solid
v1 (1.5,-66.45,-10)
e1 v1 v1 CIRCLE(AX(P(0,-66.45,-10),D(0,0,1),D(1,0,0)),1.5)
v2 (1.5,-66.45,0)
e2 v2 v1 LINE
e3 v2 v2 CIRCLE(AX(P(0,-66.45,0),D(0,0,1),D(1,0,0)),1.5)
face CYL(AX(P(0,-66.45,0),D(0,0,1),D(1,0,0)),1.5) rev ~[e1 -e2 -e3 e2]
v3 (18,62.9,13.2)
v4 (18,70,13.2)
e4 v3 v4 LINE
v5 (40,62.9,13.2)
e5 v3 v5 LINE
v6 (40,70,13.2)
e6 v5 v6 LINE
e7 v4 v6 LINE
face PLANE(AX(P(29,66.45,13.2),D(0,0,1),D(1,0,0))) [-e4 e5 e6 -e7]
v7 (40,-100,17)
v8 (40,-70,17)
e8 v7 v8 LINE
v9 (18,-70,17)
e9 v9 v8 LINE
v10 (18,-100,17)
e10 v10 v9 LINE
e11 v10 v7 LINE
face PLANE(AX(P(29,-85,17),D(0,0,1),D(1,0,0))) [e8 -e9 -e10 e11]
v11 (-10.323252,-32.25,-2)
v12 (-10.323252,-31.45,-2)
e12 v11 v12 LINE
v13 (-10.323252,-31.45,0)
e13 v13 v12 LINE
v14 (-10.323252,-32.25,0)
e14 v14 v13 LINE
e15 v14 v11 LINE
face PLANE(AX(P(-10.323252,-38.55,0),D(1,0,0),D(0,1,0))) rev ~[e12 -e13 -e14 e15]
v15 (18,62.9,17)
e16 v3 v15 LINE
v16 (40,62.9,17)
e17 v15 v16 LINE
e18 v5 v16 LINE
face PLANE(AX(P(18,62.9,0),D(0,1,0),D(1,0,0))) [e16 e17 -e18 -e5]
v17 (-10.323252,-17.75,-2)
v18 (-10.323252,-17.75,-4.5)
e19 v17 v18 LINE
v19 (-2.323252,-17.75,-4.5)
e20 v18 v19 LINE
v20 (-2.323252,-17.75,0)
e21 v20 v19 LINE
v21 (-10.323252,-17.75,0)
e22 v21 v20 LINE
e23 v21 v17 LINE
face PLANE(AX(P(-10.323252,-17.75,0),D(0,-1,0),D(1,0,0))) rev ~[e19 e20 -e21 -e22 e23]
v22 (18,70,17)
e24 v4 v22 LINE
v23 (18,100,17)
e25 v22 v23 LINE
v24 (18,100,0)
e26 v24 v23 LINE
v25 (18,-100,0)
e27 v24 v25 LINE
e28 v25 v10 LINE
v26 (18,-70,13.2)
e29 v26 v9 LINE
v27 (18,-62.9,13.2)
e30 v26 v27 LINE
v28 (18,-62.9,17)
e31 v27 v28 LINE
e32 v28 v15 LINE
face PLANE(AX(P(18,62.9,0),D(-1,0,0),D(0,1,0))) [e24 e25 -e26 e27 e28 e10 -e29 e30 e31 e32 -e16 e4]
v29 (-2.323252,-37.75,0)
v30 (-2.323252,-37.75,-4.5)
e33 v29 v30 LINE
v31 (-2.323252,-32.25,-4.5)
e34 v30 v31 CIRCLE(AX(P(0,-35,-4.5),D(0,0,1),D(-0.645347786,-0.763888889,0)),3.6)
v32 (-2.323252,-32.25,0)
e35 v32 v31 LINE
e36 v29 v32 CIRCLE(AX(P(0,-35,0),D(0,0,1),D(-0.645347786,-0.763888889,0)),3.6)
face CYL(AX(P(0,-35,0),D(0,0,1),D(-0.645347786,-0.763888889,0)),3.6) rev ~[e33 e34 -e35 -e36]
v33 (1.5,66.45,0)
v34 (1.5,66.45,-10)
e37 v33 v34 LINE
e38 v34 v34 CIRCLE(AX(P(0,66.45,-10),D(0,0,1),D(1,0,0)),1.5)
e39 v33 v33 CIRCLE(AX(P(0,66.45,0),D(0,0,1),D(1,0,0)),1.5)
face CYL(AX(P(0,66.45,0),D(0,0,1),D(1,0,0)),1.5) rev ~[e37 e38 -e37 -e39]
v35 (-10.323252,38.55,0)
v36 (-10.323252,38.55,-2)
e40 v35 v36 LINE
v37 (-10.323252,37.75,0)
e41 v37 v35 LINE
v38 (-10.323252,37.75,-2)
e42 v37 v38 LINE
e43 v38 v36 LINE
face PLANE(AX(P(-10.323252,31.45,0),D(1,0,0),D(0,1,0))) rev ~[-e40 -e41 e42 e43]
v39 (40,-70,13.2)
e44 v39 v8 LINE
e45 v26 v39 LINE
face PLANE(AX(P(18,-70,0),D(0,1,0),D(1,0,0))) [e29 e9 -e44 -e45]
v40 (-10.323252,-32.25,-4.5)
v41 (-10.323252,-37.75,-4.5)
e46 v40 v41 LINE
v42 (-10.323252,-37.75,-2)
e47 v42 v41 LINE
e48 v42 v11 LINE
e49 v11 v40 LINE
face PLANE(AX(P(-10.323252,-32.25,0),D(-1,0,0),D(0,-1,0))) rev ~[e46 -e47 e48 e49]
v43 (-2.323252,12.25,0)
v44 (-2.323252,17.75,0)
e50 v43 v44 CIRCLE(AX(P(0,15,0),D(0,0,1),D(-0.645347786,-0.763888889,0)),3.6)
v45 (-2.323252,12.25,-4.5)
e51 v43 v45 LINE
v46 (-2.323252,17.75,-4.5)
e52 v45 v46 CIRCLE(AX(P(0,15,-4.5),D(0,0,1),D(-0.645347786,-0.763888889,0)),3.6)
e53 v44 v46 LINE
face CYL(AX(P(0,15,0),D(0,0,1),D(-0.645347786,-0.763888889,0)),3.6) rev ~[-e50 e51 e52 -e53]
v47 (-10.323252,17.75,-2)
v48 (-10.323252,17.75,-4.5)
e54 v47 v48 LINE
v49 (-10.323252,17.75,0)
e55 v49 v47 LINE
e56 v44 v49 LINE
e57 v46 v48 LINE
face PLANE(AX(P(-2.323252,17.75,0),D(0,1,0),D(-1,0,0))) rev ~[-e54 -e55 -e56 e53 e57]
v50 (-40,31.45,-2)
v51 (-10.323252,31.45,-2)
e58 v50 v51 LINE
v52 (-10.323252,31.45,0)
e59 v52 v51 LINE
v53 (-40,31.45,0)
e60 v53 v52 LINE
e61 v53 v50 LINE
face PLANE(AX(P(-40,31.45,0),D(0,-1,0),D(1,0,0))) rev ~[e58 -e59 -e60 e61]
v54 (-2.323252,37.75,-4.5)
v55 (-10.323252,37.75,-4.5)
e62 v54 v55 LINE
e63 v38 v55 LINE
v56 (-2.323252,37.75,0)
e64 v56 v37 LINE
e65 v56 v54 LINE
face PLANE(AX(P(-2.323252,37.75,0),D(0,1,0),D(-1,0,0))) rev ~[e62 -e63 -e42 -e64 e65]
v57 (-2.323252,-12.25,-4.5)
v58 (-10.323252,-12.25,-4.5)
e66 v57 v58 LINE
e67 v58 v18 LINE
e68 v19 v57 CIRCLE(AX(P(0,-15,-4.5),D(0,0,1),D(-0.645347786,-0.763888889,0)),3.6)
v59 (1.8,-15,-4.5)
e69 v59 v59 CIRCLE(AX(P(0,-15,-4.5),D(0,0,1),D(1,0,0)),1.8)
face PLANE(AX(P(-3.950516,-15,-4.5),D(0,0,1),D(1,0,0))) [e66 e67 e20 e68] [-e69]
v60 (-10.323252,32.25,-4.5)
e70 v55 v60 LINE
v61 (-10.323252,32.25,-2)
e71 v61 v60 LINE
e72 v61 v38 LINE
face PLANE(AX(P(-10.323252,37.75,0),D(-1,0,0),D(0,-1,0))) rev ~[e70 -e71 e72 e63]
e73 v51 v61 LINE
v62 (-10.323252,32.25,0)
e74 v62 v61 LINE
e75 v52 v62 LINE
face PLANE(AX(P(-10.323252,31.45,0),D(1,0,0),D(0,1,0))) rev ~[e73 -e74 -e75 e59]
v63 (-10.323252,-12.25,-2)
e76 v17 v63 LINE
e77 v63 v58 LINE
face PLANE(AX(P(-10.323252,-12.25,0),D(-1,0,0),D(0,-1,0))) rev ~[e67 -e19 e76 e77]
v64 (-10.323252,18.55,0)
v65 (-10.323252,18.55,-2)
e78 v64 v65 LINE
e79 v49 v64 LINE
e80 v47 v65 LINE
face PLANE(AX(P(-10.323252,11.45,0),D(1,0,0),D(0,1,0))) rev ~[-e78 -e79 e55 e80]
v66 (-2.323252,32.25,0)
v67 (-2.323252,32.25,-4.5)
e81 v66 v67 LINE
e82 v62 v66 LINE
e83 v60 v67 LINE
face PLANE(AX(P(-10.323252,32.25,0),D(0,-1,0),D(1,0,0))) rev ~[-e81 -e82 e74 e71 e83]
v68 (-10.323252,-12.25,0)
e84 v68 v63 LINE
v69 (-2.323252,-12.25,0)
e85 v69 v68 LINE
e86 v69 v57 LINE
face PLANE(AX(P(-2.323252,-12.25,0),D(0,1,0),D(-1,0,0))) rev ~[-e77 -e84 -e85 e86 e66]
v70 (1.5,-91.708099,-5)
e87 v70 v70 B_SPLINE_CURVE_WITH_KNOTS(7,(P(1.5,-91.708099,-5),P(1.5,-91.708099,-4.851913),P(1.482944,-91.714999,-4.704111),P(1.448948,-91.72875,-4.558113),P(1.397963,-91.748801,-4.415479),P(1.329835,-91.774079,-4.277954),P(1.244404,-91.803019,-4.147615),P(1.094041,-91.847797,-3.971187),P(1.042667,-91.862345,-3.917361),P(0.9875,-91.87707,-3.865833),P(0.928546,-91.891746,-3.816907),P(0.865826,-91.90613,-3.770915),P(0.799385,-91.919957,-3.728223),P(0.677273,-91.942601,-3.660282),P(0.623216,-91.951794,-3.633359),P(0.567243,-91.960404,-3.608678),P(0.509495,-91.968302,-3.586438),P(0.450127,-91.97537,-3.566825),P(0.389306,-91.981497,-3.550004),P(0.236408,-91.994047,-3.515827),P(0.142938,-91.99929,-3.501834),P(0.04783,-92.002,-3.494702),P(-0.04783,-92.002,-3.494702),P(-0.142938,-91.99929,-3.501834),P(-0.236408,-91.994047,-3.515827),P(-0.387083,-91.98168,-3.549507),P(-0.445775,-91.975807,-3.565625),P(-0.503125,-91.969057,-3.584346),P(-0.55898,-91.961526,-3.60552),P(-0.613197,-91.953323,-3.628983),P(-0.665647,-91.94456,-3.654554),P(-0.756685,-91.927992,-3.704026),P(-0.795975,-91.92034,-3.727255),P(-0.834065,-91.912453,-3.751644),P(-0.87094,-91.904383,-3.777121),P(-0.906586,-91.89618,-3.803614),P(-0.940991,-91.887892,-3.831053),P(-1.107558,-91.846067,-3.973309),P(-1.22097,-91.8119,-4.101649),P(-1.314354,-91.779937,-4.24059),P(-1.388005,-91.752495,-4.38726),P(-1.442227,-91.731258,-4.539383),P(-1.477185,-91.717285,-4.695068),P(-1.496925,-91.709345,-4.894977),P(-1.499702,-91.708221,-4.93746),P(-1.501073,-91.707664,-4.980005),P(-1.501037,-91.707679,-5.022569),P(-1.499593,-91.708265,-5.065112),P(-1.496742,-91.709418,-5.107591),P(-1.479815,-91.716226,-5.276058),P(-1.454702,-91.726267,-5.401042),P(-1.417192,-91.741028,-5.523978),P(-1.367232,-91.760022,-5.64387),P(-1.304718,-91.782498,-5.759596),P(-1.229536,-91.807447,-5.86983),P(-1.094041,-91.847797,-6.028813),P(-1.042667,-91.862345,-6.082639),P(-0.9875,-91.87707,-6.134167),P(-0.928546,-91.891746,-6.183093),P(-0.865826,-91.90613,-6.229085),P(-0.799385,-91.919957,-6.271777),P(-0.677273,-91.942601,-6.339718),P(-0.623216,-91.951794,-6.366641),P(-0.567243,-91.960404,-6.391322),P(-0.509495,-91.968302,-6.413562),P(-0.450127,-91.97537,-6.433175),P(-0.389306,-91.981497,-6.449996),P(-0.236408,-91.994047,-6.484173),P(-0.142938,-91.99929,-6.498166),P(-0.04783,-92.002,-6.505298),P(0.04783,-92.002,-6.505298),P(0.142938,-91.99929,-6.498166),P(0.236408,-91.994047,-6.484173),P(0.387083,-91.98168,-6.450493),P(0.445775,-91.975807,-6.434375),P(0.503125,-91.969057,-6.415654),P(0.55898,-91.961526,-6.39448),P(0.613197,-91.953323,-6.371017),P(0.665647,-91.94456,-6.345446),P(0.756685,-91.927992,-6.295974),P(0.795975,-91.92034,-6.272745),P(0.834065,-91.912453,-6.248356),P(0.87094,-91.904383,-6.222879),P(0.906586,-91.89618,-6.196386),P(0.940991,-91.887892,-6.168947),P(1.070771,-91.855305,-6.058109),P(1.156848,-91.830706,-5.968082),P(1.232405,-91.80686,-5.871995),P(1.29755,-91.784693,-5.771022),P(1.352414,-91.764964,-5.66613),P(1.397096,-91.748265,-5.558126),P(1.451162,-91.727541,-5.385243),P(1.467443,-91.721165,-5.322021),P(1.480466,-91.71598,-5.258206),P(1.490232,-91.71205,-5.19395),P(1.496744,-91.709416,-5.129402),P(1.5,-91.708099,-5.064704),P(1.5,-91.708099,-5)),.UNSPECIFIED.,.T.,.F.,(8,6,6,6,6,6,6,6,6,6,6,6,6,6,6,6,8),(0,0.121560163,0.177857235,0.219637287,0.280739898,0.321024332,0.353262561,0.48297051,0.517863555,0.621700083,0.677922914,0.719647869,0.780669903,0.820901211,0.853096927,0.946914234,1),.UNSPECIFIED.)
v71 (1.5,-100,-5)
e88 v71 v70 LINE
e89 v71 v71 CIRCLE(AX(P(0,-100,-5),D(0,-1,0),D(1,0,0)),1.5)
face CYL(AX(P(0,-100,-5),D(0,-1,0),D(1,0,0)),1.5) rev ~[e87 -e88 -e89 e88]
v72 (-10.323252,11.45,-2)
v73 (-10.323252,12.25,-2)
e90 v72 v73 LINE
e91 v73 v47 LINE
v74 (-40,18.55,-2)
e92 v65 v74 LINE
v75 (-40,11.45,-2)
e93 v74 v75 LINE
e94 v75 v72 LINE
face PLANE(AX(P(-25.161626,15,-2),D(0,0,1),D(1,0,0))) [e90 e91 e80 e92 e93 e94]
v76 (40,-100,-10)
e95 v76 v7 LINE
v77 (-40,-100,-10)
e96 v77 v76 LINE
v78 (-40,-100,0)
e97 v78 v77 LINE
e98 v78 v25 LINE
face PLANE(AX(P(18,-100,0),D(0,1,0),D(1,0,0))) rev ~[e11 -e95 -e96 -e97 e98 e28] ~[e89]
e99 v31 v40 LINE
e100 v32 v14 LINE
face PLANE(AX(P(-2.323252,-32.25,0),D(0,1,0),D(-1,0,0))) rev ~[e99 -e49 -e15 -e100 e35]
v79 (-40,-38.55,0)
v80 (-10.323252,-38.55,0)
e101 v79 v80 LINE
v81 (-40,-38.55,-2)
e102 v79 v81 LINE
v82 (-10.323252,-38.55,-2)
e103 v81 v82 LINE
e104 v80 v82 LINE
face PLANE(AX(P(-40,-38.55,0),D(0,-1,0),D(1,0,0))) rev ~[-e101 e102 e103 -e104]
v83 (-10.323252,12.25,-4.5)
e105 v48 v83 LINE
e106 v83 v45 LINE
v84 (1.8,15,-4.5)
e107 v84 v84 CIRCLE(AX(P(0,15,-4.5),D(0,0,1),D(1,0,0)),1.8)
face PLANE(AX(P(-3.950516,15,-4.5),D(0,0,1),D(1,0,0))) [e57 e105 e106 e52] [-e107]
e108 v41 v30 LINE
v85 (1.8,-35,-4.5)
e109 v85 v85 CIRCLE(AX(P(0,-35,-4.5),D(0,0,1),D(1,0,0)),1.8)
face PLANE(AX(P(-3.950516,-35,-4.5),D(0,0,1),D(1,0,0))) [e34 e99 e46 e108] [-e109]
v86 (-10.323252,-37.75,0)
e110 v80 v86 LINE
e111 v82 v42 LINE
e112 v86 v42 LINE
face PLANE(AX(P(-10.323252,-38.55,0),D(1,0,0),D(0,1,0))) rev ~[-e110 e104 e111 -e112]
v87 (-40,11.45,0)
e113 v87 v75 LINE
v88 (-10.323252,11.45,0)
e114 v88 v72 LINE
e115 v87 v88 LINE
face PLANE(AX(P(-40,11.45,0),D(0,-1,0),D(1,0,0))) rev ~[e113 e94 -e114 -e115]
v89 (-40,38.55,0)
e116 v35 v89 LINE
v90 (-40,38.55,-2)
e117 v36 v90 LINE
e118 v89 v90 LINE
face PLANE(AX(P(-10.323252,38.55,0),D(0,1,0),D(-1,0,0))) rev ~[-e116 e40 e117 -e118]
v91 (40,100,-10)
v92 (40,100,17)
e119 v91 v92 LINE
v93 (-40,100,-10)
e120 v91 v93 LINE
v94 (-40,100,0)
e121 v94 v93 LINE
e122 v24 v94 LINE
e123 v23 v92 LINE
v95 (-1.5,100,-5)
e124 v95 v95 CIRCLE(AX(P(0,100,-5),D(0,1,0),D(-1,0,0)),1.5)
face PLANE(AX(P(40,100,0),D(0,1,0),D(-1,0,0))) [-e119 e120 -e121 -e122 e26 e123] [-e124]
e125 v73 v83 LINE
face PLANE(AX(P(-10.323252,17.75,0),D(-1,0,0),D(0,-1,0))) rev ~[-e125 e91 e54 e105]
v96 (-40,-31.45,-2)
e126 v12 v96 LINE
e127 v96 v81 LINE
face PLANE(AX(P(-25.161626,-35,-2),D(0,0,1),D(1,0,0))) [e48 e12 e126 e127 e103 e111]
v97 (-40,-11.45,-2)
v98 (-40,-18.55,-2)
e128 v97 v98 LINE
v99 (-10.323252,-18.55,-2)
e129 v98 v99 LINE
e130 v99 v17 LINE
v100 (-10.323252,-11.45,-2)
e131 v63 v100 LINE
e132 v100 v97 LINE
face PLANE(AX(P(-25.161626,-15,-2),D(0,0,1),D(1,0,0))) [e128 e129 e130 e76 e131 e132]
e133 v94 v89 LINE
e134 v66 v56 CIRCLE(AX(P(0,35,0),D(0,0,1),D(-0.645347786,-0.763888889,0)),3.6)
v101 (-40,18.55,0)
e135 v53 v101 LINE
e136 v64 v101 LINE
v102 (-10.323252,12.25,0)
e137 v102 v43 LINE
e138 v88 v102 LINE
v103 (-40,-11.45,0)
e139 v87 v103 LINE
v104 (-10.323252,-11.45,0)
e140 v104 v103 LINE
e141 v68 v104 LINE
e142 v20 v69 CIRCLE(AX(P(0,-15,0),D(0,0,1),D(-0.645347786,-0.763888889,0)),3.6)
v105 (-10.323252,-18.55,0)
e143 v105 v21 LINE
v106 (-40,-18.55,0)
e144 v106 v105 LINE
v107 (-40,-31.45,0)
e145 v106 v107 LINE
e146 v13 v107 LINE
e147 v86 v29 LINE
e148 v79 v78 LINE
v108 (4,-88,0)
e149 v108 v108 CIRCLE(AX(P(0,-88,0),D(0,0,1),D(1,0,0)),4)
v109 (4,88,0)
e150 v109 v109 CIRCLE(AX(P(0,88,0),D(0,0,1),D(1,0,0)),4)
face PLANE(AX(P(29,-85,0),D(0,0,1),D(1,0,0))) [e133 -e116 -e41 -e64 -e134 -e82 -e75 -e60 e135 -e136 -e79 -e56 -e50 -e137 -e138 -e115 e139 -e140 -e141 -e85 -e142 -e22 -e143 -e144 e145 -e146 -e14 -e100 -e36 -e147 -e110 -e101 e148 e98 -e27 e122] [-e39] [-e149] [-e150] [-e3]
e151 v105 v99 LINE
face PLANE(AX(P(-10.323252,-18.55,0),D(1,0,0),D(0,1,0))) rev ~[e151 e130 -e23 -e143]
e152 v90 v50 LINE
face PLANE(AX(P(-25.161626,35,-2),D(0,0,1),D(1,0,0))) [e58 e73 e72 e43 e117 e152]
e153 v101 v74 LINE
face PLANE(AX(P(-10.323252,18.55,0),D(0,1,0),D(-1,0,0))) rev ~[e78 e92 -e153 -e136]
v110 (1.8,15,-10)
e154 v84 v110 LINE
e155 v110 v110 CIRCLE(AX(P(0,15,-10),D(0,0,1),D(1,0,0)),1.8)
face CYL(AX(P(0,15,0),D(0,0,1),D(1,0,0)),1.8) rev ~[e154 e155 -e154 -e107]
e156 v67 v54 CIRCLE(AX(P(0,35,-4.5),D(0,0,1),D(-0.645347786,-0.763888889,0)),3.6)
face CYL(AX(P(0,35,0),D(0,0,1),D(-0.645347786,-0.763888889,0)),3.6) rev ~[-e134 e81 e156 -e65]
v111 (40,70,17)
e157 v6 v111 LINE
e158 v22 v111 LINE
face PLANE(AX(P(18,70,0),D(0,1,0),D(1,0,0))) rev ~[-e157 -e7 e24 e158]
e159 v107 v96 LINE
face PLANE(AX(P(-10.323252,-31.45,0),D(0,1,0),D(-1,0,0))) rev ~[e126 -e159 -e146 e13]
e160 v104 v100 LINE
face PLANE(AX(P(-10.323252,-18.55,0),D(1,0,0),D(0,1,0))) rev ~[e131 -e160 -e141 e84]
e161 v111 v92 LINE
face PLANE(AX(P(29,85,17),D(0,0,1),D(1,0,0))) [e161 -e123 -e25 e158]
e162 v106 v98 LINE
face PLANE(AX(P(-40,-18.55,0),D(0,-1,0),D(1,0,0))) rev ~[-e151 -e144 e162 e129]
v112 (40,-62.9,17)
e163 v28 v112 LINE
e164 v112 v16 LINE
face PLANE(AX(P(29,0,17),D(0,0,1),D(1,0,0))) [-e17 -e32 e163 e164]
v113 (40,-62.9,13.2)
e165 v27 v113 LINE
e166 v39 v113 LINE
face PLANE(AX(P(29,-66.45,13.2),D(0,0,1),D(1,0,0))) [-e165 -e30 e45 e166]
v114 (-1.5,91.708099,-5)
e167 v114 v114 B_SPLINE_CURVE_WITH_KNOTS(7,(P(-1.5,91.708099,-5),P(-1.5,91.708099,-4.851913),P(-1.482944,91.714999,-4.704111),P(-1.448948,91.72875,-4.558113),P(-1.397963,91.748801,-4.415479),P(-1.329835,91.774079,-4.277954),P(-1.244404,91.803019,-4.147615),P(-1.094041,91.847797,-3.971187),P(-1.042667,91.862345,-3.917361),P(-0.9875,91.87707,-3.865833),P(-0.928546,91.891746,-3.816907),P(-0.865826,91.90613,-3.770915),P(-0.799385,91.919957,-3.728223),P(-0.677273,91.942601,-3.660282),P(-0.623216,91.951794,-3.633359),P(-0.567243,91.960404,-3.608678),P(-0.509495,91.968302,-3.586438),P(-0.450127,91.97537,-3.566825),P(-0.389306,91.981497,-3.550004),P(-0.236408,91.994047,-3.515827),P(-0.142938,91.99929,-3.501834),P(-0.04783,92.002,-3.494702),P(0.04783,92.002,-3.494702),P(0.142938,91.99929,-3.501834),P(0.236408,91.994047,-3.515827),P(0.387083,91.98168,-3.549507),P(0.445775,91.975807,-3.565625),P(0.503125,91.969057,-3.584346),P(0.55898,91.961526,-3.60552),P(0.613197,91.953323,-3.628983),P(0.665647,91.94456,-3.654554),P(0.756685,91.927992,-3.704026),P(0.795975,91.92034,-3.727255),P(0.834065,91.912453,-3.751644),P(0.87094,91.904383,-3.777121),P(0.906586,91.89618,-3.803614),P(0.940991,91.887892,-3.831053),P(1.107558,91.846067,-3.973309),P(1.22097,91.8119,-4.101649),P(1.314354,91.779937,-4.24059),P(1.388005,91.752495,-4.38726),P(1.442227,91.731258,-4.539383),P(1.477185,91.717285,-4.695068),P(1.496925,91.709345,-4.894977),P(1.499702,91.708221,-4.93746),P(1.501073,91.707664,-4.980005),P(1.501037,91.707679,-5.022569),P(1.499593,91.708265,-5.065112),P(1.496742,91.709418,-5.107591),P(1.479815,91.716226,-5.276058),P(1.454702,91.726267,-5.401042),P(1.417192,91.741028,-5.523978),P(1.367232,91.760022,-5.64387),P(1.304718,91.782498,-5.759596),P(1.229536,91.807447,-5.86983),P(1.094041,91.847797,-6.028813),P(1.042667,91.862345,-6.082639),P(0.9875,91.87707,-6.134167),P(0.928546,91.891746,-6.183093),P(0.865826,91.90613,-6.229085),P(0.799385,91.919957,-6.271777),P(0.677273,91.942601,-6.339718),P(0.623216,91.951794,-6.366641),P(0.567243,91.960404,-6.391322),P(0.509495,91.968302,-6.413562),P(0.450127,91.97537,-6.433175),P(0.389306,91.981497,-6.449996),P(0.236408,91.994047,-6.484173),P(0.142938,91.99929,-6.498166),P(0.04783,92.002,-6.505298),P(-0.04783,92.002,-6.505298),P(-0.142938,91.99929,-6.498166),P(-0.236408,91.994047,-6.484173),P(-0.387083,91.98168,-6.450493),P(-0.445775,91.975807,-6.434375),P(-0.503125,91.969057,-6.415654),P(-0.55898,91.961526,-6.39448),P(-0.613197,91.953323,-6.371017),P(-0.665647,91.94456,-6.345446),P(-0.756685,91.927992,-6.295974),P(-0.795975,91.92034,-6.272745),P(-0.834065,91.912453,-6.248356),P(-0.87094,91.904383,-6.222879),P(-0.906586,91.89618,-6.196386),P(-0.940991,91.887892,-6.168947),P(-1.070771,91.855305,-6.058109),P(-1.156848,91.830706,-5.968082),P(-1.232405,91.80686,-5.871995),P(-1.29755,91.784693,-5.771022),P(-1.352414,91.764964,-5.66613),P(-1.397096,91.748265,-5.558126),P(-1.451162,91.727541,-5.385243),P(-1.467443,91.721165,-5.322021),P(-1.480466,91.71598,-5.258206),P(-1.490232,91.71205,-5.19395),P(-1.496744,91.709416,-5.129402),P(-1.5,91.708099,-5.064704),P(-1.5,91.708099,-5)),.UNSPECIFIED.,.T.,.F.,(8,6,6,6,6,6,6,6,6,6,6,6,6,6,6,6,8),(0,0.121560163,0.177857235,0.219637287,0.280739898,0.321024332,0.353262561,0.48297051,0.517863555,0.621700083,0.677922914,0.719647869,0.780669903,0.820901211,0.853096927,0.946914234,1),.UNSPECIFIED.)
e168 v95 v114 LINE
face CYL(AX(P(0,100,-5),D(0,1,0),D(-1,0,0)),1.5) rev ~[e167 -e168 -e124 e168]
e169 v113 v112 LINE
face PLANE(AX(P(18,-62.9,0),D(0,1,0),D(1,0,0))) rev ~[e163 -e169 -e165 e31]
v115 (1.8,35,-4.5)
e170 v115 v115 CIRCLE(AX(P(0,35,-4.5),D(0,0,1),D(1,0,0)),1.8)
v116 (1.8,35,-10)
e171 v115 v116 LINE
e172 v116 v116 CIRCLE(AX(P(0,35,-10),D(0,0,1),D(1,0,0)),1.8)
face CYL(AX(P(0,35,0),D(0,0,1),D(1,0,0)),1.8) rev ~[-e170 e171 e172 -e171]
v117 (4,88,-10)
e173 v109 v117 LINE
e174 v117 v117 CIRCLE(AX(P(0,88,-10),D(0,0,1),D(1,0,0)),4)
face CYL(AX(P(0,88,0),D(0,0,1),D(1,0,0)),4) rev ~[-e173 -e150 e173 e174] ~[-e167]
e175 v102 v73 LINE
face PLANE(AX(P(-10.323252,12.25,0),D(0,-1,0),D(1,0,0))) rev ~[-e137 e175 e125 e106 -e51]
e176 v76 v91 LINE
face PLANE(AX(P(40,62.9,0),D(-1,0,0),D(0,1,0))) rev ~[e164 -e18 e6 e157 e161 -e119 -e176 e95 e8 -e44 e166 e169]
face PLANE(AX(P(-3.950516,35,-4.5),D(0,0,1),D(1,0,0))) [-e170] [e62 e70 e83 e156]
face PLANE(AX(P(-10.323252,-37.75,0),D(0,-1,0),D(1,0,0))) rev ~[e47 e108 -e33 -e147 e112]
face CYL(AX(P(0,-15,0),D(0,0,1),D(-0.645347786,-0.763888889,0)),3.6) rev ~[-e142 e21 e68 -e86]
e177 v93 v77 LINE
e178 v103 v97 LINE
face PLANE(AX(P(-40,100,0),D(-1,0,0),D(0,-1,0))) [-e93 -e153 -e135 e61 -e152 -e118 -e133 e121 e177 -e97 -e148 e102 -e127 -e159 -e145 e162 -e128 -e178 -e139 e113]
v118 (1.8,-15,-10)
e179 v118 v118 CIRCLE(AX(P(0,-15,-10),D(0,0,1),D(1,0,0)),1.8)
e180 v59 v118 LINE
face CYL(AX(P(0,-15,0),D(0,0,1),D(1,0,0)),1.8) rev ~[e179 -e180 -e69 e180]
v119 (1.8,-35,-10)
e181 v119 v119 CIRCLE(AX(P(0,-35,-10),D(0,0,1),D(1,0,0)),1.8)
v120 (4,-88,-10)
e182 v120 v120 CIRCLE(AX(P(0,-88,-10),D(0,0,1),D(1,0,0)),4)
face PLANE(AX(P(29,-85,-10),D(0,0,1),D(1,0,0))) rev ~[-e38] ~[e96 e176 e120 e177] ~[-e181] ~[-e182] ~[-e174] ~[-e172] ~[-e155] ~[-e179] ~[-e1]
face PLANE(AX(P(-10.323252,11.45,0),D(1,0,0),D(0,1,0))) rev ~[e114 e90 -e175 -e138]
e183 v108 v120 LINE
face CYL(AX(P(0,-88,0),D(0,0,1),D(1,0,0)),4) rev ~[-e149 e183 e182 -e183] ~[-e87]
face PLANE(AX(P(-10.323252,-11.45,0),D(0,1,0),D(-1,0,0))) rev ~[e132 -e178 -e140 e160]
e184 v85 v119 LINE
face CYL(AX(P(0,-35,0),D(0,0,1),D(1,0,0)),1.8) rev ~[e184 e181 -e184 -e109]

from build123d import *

# Parameters (mm, degrees)
F0_W     = 22
F0_H     = 30
F0_R     = 4
F0_R_2   = 1.5
F0_H_2   = 7.1
F0_H_3   = 125.8
F0_R_3   = 1.8
F1_DEPTH = 10
F2_DEPTH = 4.5
F3_DEPTH = 17
F4_DEPTH = 13.2
F5_R     = 1.5
F6_DEPTH = 15
F7_R     = 1.5
F8_DEPTH = 15
F9_DEPTH = 2


# Not quite as in the source:
# - a feature names something its author has since deleted; it is built from what else it names


with BuildPart() as f1:
    # F0 (on Top) → F1 (new body)
    with BuildSketch(Plane.XY):
        with Locations((29, -85)):
            Rectangle(F0_W, F0_H)
        with BuildLine():
            Line((-40, -100), (18, -100))
            Line((18, -100), (18, -70))
            Line((18, -70), (18, -62.9))
            Line((18, -62.9), (18, 62.9))
            Line((18, 62.9), (18, 70))
            Line((18, 70), (18, 100))
            Line((18, 100), (-40, 100))
            Line((-40, 100), (-40, 38.55))
            Line((-40, 38.55), (-10.3232520311, 38.55))
            Line((-10.3232520311, 38.55), (-10.3232520311, 37.75))
            Line((-10.3232520311, 37.75), (-2.3232520311, 37.75))
            ThreePointArc((-2.3232520311, 37.75), (3.6, 35), (-2.3232520311, 32.25))
            Line((-2.3232520311, 32.25), (-10.3232520311, 32.25))
            Line((-10.3232520311, 32.25), (-10.3232520311, 31.45))
            Line((-10.3232520311, 31.45), (-40, 31.45))
            Line((-40, 31.45), (-40, 18.55))
            Line((-40, 18.55), (-10.3232520311, 18.55))
            Line((-10.3232520311, 18.55), (-10.3232520311, 17.75))
            Line((-10.3232520311, 17.75), (-2.3232520311, 17.75))
            ThreePointArc((-2.3232520311, 17.75), (3.6, 15), (-2.3232520311, 12.25))
            Line((-2.3232520311, 12.25), (-10.3232520311, 12.25))
            Line((-10.3232520311, 12.25), (-10.3232520311, 11.45))
            Line((-10.3232520311, 11.45), (-40, 11.45))
            Line((-40, 11.45), (-40, -11.45))
            Line((-40, -11.45), (-10.3232520311, -11.45))
            Line((-10.3232520311, -11.45), (-10.3232520311, -12.25))
            Line((-10.3232520311, -12.25), (-2.3232520311, -12.25))
            ThreePointArc((-2.3232520311, -12.25), (3.6, -15), (-2.3232520311, -17.75))
            Line((-2.3232520311, -17.75), (-10.3232520311, -17.75))
            Line((-10.3232520311, -17.75), (-10.3232520311, -18.55))
            Line((-10.3232520311, -18.55), (-40, -18.55))
            Line((-40, -18.55), (-40, -31.45))
            Line((-40, -31.45), (-10.3232520311, -31.45))
            Line((-10.3232520311, -31.45), (-10.3232520311, -32.25))
            Line((-10.3232520311, -32.25), (-2.3232520311, -32.25))
            ThreePointArc((-2.3232520311, -32.25), (3.6, -35), (-2.3232520311, -37.75))
            Line((-2.3232520311, -37.75), (-10.3232520311, -37.75))
            Line((-10.3232520311, -37.75), (-10.3232520311, -38.55))
            Line((-10.3232520311, -38.55), (-40, -38.55))
            Line((-40, -38.55), (-40, -100))
        make_face()
        with Locations((0, -88)):
            Circle(F0_R, mode=Mode.SUBTRACT)
        with Locations((0, -66.45)):
            Circle(F0_R_2, mode=Mode.SUBTRACT)
        with Locations((0, 66.45)):
            Circle(F0_R_2, mode=Mode.SUBTRACT)
        with Locations((0, 88)):
            Circle(F0_R, mode=Mode.SUBTRACT)
        with Locations((29, -66.45)):
            Rectangle(F0_W, F0_H_2)
        with Locations((29, 0)):
            Rectangle(F0_W, F0_H_3)
        Polygon((-40, -31.45), (-40, -38.55), (-10.3232520311, -38.55), (-10.3232520311, -37.75), (-10.3232520311, -32.25), (-10.3232520311, -31.45), align=None)
        with Locations((29, 66.45)):
            Rectangle(F0_W, F0_H_2)
        with Locations((29, 85)):
            Rectangle(F0_W, F0_H)
        Polygon((-40, -11.45), (-40, -18.55), (-10.3232520311, -18.55), (-10.3232520311, -17.75), (-10.3232520311, -12.25), (-10.3232520311, -11.45), align=None)
        Polygon((-40, 18.55), (-40, 11.45), (-10.3232520311, 11.45), (-10.3232520311, 12.25), (-10.3232520311, 17.75), (-10.3232520311, 18.55), align=None)
        Polygon((-10.3232520311, 38.55), (-40, 38.55), (-40, 31.45), (-10.3232520311, 31.45), (-10.3232520311, 32.25), (-10.3232520311, 37.75), align=None)
        with BuildLine():
            Line((-10.3232520311, 17.75), (-10.3232520311, 12.25))
            Line((-10.3232520311, 12.25), (-2.3232520311, 12.25))
            ThreePointArc((-2.3232520311, 12.25), (3.6, 15), (-2.3232520311, 17.75))
            Line((-2.3232520311, 17.75), (-10.3232520311, 17.75))
        make_face()
        with Locations((0, 15)):
            Circle(F0_R_3, mode=Mode.SUBTRACT)
        with BuildLine():
            Line((-2.3232520311, 37.75), (-10.3232520311, 37.75))
            Line((-10.3232520311, 37.75), (-10.3232520311, 32.25))
            Line((-10.3232520311, 32.25), (-2.3232520311, 32.25))
            ThreePointArc((-2.3232520311, 32.25), (3.6, 35), (-2.3232520311, 37.75))
        make_face()
        with Locations((0, 35)):
            Circle(F0_R_3, mode=Mode.SUBTRACT)
        with BuildLine():
            Line((-10.3232520311, -12.25), (-10.3232520311, -17.75))
            Line((-10.3232520311, -17.75), (-2.3232520311, -17.75))
            ThreePointArc((-2.3232520311, -17.75), (3.6, -15), (-2.3232520311, -12.25))
            Line((-2.3232520311, -12.25), (-10.3232520311, -12.25))
        make_face()
        with Locations((0, -15)):
            Circle(F0_R_3, mode=Mode.SUBTRACT)
        with BuildLine():
            Line((-10.3232520311, -32.25), (-10.3232520311, -37.75))
            Line((-10.3232520311, -37.75), (-2.3232520311, -37.75))
            ThreePointArc((-2.3232520311, -37.75), (3.6, -35), (-2.3232520311, -32.25))
            Line((-2.3232520311, -32.25), (-10.3232520311, -32.25))
        make_face()
        with Locations((0, -35)):
            Circle(F0_R_3, mode=Mode.SUBTRACT)
    extrude(amount=-F1_DEPTH)

    # F0 (on Top) → F2 (cut)
    with BuildSketch(Plane.XY):
        with BuildLine():
            Line((-10.3232520311, -32.25), (-10.3232520311, -37.75))
            Line((-10.3232520311, -37.75), (-2.3232520311, -37.75))
            ThreePointArc((-2.3232520311, -37.75), (3.6, -35), (-2.3232520311, -32.25))
            Line((-2.3232520311, -32.25), (-10.3232520311, -32.25))
        make_face()
        with Locations((0, -35)):
            Circle(F0_R_3, mode=Mode.SUBTRACT)
        with BuildLine():
            Line((-10.3232520311, -12.25), (-10.3232520311, -17.75))
            Line((-10.3232520311, -17.75), (-2.3232520311, -17.75))
            ThreePointArc((-2.3232520311, -17.75), (3.6, -15), (-2.3232520311, -12.25))
            Line((-2.3232520311, -12.25), (-10.3232520311, -12.25))
        make_face()
        with Locations((0, -15)):
            Circle(F0_R_3, mode=Mode.SUBTRACT)
        with BuildLine():
            Line((-10.3232520311, 17.75), (-10.3232520311, 12.25))
            Line((-10.3232520311, 12.25), (-2.3232520311, 12.25))
            ThreePointArc((-2.3232520311, 12.25), (3.6, 15), (-2.3232520311, 17.75))
            Line((-2.3232520311, 17.75), (-10.3232520311, 17.75))
        make_face()
        with Locations((0, 15)):
            Circle(F0_R_3, mode=Mode.SUBTRACT)
        with BuildLine():
            Line((-2.3232520311, 37.75), (-10.3232520311, 37.75))
            Line((-10.3232520311, 37.75), (-10.3232520311, 32.25))
            Line((-10.3232520311, 32.25), (-2.3232520311, 32.25))
            ThreePointArc((-2.3232520311, 32.25), (3.6, 35), (-2.3232520311, 37.75))
        make_face()
        with Locations((0, 35)):
            Circle(F0_R_3, mode=Mode.SUBTRACT)
    extrude(amount=-F2_DEPTH, mode=Mode.SUBTRACT)

    # F0 (on Top) → F3 (join)
    with BuildSketch(Plane.XY):
        with Locations((29, -85)):
            Rectangle(F0_W, F0_H)
        with Locations((29, 85)):
            Rectangle(F0_W, F0_H)
        with Locations((29, 0)):
            Rectangle(F0_W, F0_H_3)
    extrude(amount=F3_DEPTH)

    # F0 (on Top) → F4 (join)
    with BuildSketch(Plane.XY):
        with Locations((29, 66.45)):
            Rectangle(F0_W, F0_H_2)
        with Locations((29, -66.45)):
            Rectangle(F0_W, F0_H_2)
    extrude(amount=F4_DEPTH)

    # F5 (on face) → F6 (cut)
    with BuildSketch(Plane(origin=(0, 100, 0), x_dir=(-1, 0, 0), z_dir=(0, 1, 0))):
        with Locations((0, -5)):
            Circle(F5_R)
    extrude(amount=-F6_DEPTH, mode=Mode.SUBTRACT)

    # F7 (on face) → F8 (cut)
    with BuildSketch(Plane.XZ.offset(100)):
        with Locations((0, -5)):
            Circle(F7_R)
    extrude(amount=-F8_DEPTH, mode=Mode.SUBTRACT)

    # F0 (on Top) → F9 (cut)
    with BuildSketch(Plane.XY):
        Polygon((-10.3232520311, 38.55), (-40, 38.55), (-40, 31.45), (-10.3232520311, 31.45), (-10.3232520311, 32.25), (-10.3232520311, 37.75), align=None)
        Polygon((-40, 18.55), (-40, 11.45), (-10.3232520311, 11.45), (-10.3232520311, 12.25), (-10.3232520311, 17.75), (-10.3232520311, 18.55), align=None)
        Polygon((-40, -11.45), (-40, -18.55), (-10.3232520311, -18.55), (-10.3232520311, -17.75), (-10.3232520311, -12.25), (-10.3232520311, -11.45), align=None)
        Polygon((-40, -31.45), (-40, -38.55), (-10.3232520311, -38.55), (-10.3232520311, -37.75), (-10.3232520311, -32.25), (-10.3232520311, -31.45), align=None)
    extrude(amount=-F9_DEPTH, mode=Mode.SUBTRACT)


solid = f1.part
